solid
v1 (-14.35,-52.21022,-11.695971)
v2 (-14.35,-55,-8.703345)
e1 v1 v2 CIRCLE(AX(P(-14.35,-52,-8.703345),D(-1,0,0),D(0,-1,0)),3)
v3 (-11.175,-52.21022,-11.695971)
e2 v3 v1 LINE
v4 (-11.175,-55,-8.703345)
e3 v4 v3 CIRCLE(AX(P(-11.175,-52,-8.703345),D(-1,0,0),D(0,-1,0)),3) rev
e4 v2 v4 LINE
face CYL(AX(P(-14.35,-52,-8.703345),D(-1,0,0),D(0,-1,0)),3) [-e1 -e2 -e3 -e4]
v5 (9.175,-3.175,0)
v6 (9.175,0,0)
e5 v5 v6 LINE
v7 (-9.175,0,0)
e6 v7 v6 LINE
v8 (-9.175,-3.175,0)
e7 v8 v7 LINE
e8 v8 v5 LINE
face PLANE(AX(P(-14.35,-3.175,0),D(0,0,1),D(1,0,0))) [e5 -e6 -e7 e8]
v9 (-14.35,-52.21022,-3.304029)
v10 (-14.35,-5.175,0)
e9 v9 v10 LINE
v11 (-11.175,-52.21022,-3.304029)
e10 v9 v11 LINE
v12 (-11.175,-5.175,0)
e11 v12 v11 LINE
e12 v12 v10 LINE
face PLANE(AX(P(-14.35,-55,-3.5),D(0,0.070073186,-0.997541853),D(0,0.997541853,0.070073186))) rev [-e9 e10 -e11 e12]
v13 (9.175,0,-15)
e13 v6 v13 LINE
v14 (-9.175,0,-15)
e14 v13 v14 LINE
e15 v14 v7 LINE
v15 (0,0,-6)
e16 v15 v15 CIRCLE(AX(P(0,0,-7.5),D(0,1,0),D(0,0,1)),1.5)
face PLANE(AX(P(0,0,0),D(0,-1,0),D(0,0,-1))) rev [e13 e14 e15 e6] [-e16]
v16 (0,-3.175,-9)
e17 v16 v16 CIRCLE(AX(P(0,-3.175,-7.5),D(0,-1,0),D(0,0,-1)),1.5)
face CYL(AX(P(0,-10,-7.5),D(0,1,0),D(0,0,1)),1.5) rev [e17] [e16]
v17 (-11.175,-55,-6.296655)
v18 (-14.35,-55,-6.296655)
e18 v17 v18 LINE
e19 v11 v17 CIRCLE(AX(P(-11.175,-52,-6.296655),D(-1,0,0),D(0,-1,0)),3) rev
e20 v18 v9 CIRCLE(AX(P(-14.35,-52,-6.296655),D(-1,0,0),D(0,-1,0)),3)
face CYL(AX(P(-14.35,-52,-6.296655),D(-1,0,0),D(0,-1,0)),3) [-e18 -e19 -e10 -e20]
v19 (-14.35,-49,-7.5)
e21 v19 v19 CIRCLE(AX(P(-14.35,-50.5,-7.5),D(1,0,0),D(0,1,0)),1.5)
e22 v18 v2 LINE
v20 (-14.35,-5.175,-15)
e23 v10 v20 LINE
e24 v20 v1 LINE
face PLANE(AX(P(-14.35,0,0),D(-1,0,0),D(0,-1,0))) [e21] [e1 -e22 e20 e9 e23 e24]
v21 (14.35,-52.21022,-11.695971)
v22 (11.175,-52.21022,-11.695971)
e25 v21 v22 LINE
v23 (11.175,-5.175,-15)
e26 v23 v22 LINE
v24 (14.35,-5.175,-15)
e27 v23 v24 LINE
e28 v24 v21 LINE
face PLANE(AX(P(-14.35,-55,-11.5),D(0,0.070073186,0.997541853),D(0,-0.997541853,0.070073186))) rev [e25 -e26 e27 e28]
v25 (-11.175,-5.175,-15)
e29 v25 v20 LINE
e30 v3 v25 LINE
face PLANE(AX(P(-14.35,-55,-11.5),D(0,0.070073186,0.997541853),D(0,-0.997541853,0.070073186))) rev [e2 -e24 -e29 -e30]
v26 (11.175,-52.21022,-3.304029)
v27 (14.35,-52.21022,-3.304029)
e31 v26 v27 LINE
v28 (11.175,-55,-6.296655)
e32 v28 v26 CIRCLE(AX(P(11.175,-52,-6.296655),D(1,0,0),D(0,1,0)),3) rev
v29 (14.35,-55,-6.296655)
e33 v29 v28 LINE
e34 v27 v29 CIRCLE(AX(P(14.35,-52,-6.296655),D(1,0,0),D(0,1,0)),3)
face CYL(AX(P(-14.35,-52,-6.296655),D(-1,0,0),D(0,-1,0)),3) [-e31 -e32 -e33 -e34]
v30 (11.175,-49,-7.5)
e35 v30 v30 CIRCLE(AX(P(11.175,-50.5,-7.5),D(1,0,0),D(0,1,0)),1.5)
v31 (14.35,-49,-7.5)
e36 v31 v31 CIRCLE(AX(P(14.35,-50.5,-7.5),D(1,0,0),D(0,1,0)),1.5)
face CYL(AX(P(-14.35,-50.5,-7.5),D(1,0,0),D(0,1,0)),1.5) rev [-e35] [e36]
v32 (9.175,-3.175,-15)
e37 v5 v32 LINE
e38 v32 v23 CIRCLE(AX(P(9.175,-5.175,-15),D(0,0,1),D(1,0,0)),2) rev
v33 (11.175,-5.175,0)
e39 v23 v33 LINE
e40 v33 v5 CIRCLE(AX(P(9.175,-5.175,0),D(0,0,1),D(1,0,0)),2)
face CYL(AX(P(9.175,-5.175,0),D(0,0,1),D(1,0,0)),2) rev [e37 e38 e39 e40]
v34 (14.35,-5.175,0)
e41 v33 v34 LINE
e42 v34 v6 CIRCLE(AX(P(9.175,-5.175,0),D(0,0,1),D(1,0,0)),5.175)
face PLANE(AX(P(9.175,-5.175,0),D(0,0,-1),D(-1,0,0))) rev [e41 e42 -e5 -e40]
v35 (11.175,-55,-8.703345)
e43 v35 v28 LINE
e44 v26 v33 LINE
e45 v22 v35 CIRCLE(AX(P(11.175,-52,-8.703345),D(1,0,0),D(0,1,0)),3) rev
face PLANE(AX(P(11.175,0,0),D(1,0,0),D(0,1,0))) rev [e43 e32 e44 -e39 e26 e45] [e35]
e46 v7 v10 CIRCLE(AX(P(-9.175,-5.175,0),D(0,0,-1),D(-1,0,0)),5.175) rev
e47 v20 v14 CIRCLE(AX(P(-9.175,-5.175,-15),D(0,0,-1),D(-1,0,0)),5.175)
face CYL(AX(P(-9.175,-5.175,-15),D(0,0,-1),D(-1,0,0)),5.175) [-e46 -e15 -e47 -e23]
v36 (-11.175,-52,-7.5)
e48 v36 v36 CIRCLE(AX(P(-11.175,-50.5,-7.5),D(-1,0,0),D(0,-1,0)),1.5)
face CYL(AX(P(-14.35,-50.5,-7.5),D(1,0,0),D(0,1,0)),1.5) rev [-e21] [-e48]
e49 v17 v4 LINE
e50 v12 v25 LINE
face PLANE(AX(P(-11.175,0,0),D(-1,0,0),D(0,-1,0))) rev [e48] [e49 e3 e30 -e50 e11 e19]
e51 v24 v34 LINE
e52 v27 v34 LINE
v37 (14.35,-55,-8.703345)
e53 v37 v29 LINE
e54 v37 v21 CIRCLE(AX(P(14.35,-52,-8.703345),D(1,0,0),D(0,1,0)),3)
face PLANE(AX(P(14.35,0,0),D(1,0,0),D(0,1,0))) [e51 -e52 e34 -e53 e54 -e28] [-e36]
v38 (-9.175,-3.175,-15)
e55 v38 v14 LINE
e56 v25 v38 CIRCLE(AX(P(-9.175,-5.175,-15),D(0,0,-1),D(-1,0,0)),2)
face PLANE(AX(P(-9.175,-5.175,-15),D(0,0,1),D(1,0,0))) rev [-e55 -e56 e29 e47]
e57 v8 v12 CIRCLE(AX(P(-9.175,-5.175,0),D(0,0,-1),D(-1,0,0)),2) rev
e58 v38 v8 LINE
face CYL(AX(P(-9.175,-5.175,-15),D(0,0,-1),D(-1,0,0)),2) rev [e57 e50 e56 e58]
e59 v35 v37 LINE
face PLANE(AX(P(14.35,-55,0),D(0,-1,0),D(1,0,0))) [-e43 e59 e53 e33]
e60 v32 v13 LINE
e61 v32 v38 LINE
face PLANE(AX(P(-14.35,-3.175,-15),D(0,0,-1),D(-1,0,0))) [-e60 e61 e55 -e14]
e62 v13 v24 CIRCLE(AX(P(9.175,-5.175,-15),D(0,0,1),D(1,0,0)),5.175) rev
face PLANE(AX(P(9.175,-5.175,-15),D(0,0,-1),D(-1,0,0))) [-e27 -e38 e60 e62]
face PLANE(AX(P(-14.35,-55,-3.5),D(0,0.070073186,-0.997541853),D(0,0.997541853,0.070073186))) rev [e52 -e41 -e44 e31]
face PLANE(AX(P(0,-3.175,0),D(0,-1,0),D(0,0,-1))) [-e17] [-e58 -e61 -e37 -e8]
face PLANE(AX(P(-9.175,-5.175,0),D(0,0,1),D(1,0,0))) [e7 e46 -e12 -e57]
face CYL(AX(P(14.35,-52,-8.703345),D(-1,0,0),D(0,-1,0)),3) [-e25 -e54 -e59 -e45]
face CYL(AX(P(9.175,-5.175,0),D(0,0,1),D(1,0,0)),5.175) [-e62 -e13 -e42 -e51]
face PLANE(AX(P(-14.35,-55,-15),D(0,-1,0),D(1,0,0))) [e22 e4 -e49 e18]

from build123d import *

# Parameters (mm, degrees)
SKETCH8_W                    = 28.7
SKETCH8_H                    = 15
BASE_FLANGE1_DEPTH           = 3.175
EDGE_FLANGE1_STRIP_W         = 16.7
EDGE_FLANGE1_STRIP_H         = 3.175
EDGE_FLANGE1_STRIP_CUT_DEPTH = 15
EDGE_FLANGE1_DEPTH           = 15
EDGE_FLANGE2_STRIP_W         = 16.7
EDGE_FLANGE2_STRIP_H         = 3.175
EDGE_FLANGE2_STRIP_CUT_DEPTH = 15
EDGE_FLANGE2_DEPTH           = 15
SKETCH19_R                   = 1.5
CUT_EXTRUDE1_DEPTH           = 10
CUT_EXTRUDE2_DEPTH           = 64.825465137
CUT_EXTRUDE2_DEPTH_BACK      = 64.825465137
CUT_EXTRUDE3_DEPTH           = 64.825465137
CUT_EXTRUDE3_DEPTH_BACK      = 64.825465137
SKETCH21_R                   = 1.5
FILLET1_R                    = 3


# Sheet-metal steps are written as plain solids
with BuildPart() as part:
    # Sketch8 → Base-Flange1 (new body)
    with BuildSketch(Plane(origin=(0, 0, 0), x_dir=(1, 0, 0), z_dir=(0, 1, 0))):
        with Locations((0, 7.5)):
            Rectangle(SKETCH8_W, SKETCH8_H)
    extrude(amount=-BASE_FLANGE1_DEPTH)

    # Edge-Flange1 strip (across the edge) → Edge-Flange1 strip cut (cut)
    with BuildSketch(Plane(origin=(14.35, -3.175, -15), x_dir=(-1, 0, 0), z_dir=(0, 0, 1))):
        with Locations((-3.175, -1.5875)):
            Rectangle(EDGE_FLANGE1_STRIP_W, EDGE_FLANGE1_STRIP_H)
    extrude(amount=EDGE_FLANGE1_STRIP_CUT_DEPTH, mode=Mode.SUBTRACT)

    # Edge-Flange1 section (across the edge) → Edge-Flange1 (add)
    with BuildSketch(Plane(origin=(14.35, -3.175, -15), x_dir=(-1, 0, 0), z_dir=(0, 0, 1))):
        with BuildLine():
            Line((0, 2), (0, 51.825))
            Line((0, 51.825), (3.175, 51.825))
            Line((3.175, 51.825), (3.175, 2))
            ThreePointArc((3.175, 2), (3.760786438, 0.585786438), (5.175, 0))
            Line((5.175, 0), (5.175, -3.175))
            ThreePointArc((5.175, -3.175), (1.515722407, -1.659277593), (0, 2))
        make_face()
    extrude(amount=EDGE_FLANGE1_DEPTH)

    # Edge-Flange2 strip (across the edge) → Edge-Flange2 strip cut (cut)
    with BuildSketch(Plane(origin=(-14.35, -3.175, 0), x_dir=(1, 0, 0), z_dir=(0, 0, -1))):
        with Locations((-3.175, -1.5875)):
            Rectangle(EDGE_FLANGE2_STRIP_W, EDGE_FLANGE2_STRIP_H)
    extrude(amount=EDGE_FLANGE2_STRIP_CUT_DEPTH, mode=Mode.SUBTRACT)

    # Edge-Flange2 section (across the edge) → Edge-Flange2 (add)
    with BuildSketch(Plane(origin=(-14.35, -3.175, 0), x_dir=(1, 0, 0), z_dir=(0, 0, -1))):
        with BuildLine():
            Line((0, 2), (0, 51.825))
            Line((0, 51.825), (3.175, 51.825))
            Line((3.175, 51.825), (3.175, 2))
            ThreePointArc((3.175, 2), (3.760786438, 0.585786438), (5.175, 0))
            Line((5.175, 0), (5.175, -3.175))
            ThreePointArc((5.175, -3.175), (1.515722407, -1.659277593), (0, 2))
        make_face()
    extrude(amount=EDGE_FLANGE2_DEPTH)

    # Sketch19 → Cut-Extrude1 (cut)
    with BuildSketch(Plane(origin=(0, 0, 0), x_dir=(1, 0, 0), z_dir=(0, 1, 0))):
        with Locations(Location((0, 7.5, 0), (0, 0, 270))):
            Circle(SKETCH19_R)
    extrude(amount=-CUT_EXTRUDE1_DEPTH, mode=Mode.SUBTRACT)

    # Sketch20 → Cut-Extrude2 (cut, two sides: drawn at the far end of the back side and taken through both)
    with BuildSketch(Plane(origin=(14.35, 0, 0), x_dir=(0, 0, -1), z_dir=(1, 0, 0)).offset(-CUT_EXTRUDE2_DEPTH_BACK)):
        Polygon((11.5, -55), (15, -5.175), (15, -55), align=None)
        Polygon((3.5, -55), (0, -5.175), (0, -55), align=None)
    extrude(amount=CUT_EXTRUDE2_DEPTH + CUT_EXTRUDE2_DEPTH_BACK, mode=Mode.SUBTRACT)

    # Sketch21 → Cut-Extrude3 (cut, two sides: drawn at the far end of the back side and taken through both)
    with BuildSketch(Plane(origin=(14.35, 0, 0), x_dir=(0, 0, -1), z_dir=(1, 0, 0)).offset(-CUT_EXTRUDE3_DEPTH_BACK)):
        with Locations(Location((7.5, -50.5, 0), (0, 0, 90))):
            Circle(SKETCH21_R)
    extrude(amount=CUT_EXTRUDE3_DEPTH + CUT_EXTRUDE3_DEPTH_BACK, mode=Mode.SUBTRACT)

    # Fillet1
    fillet1_edges = [part.edges().sort_by_distance(p)[0] for p in [
        (12.7625, -55, -3.5),
        (12.7625, -55, -11.5),
        (-12.7625, -55, -3.5),
        (-12.7625, -55, -11.5),
    ]]
    fillet(fillet1_edges, radius=FILLET1_R)


solid = part.part
